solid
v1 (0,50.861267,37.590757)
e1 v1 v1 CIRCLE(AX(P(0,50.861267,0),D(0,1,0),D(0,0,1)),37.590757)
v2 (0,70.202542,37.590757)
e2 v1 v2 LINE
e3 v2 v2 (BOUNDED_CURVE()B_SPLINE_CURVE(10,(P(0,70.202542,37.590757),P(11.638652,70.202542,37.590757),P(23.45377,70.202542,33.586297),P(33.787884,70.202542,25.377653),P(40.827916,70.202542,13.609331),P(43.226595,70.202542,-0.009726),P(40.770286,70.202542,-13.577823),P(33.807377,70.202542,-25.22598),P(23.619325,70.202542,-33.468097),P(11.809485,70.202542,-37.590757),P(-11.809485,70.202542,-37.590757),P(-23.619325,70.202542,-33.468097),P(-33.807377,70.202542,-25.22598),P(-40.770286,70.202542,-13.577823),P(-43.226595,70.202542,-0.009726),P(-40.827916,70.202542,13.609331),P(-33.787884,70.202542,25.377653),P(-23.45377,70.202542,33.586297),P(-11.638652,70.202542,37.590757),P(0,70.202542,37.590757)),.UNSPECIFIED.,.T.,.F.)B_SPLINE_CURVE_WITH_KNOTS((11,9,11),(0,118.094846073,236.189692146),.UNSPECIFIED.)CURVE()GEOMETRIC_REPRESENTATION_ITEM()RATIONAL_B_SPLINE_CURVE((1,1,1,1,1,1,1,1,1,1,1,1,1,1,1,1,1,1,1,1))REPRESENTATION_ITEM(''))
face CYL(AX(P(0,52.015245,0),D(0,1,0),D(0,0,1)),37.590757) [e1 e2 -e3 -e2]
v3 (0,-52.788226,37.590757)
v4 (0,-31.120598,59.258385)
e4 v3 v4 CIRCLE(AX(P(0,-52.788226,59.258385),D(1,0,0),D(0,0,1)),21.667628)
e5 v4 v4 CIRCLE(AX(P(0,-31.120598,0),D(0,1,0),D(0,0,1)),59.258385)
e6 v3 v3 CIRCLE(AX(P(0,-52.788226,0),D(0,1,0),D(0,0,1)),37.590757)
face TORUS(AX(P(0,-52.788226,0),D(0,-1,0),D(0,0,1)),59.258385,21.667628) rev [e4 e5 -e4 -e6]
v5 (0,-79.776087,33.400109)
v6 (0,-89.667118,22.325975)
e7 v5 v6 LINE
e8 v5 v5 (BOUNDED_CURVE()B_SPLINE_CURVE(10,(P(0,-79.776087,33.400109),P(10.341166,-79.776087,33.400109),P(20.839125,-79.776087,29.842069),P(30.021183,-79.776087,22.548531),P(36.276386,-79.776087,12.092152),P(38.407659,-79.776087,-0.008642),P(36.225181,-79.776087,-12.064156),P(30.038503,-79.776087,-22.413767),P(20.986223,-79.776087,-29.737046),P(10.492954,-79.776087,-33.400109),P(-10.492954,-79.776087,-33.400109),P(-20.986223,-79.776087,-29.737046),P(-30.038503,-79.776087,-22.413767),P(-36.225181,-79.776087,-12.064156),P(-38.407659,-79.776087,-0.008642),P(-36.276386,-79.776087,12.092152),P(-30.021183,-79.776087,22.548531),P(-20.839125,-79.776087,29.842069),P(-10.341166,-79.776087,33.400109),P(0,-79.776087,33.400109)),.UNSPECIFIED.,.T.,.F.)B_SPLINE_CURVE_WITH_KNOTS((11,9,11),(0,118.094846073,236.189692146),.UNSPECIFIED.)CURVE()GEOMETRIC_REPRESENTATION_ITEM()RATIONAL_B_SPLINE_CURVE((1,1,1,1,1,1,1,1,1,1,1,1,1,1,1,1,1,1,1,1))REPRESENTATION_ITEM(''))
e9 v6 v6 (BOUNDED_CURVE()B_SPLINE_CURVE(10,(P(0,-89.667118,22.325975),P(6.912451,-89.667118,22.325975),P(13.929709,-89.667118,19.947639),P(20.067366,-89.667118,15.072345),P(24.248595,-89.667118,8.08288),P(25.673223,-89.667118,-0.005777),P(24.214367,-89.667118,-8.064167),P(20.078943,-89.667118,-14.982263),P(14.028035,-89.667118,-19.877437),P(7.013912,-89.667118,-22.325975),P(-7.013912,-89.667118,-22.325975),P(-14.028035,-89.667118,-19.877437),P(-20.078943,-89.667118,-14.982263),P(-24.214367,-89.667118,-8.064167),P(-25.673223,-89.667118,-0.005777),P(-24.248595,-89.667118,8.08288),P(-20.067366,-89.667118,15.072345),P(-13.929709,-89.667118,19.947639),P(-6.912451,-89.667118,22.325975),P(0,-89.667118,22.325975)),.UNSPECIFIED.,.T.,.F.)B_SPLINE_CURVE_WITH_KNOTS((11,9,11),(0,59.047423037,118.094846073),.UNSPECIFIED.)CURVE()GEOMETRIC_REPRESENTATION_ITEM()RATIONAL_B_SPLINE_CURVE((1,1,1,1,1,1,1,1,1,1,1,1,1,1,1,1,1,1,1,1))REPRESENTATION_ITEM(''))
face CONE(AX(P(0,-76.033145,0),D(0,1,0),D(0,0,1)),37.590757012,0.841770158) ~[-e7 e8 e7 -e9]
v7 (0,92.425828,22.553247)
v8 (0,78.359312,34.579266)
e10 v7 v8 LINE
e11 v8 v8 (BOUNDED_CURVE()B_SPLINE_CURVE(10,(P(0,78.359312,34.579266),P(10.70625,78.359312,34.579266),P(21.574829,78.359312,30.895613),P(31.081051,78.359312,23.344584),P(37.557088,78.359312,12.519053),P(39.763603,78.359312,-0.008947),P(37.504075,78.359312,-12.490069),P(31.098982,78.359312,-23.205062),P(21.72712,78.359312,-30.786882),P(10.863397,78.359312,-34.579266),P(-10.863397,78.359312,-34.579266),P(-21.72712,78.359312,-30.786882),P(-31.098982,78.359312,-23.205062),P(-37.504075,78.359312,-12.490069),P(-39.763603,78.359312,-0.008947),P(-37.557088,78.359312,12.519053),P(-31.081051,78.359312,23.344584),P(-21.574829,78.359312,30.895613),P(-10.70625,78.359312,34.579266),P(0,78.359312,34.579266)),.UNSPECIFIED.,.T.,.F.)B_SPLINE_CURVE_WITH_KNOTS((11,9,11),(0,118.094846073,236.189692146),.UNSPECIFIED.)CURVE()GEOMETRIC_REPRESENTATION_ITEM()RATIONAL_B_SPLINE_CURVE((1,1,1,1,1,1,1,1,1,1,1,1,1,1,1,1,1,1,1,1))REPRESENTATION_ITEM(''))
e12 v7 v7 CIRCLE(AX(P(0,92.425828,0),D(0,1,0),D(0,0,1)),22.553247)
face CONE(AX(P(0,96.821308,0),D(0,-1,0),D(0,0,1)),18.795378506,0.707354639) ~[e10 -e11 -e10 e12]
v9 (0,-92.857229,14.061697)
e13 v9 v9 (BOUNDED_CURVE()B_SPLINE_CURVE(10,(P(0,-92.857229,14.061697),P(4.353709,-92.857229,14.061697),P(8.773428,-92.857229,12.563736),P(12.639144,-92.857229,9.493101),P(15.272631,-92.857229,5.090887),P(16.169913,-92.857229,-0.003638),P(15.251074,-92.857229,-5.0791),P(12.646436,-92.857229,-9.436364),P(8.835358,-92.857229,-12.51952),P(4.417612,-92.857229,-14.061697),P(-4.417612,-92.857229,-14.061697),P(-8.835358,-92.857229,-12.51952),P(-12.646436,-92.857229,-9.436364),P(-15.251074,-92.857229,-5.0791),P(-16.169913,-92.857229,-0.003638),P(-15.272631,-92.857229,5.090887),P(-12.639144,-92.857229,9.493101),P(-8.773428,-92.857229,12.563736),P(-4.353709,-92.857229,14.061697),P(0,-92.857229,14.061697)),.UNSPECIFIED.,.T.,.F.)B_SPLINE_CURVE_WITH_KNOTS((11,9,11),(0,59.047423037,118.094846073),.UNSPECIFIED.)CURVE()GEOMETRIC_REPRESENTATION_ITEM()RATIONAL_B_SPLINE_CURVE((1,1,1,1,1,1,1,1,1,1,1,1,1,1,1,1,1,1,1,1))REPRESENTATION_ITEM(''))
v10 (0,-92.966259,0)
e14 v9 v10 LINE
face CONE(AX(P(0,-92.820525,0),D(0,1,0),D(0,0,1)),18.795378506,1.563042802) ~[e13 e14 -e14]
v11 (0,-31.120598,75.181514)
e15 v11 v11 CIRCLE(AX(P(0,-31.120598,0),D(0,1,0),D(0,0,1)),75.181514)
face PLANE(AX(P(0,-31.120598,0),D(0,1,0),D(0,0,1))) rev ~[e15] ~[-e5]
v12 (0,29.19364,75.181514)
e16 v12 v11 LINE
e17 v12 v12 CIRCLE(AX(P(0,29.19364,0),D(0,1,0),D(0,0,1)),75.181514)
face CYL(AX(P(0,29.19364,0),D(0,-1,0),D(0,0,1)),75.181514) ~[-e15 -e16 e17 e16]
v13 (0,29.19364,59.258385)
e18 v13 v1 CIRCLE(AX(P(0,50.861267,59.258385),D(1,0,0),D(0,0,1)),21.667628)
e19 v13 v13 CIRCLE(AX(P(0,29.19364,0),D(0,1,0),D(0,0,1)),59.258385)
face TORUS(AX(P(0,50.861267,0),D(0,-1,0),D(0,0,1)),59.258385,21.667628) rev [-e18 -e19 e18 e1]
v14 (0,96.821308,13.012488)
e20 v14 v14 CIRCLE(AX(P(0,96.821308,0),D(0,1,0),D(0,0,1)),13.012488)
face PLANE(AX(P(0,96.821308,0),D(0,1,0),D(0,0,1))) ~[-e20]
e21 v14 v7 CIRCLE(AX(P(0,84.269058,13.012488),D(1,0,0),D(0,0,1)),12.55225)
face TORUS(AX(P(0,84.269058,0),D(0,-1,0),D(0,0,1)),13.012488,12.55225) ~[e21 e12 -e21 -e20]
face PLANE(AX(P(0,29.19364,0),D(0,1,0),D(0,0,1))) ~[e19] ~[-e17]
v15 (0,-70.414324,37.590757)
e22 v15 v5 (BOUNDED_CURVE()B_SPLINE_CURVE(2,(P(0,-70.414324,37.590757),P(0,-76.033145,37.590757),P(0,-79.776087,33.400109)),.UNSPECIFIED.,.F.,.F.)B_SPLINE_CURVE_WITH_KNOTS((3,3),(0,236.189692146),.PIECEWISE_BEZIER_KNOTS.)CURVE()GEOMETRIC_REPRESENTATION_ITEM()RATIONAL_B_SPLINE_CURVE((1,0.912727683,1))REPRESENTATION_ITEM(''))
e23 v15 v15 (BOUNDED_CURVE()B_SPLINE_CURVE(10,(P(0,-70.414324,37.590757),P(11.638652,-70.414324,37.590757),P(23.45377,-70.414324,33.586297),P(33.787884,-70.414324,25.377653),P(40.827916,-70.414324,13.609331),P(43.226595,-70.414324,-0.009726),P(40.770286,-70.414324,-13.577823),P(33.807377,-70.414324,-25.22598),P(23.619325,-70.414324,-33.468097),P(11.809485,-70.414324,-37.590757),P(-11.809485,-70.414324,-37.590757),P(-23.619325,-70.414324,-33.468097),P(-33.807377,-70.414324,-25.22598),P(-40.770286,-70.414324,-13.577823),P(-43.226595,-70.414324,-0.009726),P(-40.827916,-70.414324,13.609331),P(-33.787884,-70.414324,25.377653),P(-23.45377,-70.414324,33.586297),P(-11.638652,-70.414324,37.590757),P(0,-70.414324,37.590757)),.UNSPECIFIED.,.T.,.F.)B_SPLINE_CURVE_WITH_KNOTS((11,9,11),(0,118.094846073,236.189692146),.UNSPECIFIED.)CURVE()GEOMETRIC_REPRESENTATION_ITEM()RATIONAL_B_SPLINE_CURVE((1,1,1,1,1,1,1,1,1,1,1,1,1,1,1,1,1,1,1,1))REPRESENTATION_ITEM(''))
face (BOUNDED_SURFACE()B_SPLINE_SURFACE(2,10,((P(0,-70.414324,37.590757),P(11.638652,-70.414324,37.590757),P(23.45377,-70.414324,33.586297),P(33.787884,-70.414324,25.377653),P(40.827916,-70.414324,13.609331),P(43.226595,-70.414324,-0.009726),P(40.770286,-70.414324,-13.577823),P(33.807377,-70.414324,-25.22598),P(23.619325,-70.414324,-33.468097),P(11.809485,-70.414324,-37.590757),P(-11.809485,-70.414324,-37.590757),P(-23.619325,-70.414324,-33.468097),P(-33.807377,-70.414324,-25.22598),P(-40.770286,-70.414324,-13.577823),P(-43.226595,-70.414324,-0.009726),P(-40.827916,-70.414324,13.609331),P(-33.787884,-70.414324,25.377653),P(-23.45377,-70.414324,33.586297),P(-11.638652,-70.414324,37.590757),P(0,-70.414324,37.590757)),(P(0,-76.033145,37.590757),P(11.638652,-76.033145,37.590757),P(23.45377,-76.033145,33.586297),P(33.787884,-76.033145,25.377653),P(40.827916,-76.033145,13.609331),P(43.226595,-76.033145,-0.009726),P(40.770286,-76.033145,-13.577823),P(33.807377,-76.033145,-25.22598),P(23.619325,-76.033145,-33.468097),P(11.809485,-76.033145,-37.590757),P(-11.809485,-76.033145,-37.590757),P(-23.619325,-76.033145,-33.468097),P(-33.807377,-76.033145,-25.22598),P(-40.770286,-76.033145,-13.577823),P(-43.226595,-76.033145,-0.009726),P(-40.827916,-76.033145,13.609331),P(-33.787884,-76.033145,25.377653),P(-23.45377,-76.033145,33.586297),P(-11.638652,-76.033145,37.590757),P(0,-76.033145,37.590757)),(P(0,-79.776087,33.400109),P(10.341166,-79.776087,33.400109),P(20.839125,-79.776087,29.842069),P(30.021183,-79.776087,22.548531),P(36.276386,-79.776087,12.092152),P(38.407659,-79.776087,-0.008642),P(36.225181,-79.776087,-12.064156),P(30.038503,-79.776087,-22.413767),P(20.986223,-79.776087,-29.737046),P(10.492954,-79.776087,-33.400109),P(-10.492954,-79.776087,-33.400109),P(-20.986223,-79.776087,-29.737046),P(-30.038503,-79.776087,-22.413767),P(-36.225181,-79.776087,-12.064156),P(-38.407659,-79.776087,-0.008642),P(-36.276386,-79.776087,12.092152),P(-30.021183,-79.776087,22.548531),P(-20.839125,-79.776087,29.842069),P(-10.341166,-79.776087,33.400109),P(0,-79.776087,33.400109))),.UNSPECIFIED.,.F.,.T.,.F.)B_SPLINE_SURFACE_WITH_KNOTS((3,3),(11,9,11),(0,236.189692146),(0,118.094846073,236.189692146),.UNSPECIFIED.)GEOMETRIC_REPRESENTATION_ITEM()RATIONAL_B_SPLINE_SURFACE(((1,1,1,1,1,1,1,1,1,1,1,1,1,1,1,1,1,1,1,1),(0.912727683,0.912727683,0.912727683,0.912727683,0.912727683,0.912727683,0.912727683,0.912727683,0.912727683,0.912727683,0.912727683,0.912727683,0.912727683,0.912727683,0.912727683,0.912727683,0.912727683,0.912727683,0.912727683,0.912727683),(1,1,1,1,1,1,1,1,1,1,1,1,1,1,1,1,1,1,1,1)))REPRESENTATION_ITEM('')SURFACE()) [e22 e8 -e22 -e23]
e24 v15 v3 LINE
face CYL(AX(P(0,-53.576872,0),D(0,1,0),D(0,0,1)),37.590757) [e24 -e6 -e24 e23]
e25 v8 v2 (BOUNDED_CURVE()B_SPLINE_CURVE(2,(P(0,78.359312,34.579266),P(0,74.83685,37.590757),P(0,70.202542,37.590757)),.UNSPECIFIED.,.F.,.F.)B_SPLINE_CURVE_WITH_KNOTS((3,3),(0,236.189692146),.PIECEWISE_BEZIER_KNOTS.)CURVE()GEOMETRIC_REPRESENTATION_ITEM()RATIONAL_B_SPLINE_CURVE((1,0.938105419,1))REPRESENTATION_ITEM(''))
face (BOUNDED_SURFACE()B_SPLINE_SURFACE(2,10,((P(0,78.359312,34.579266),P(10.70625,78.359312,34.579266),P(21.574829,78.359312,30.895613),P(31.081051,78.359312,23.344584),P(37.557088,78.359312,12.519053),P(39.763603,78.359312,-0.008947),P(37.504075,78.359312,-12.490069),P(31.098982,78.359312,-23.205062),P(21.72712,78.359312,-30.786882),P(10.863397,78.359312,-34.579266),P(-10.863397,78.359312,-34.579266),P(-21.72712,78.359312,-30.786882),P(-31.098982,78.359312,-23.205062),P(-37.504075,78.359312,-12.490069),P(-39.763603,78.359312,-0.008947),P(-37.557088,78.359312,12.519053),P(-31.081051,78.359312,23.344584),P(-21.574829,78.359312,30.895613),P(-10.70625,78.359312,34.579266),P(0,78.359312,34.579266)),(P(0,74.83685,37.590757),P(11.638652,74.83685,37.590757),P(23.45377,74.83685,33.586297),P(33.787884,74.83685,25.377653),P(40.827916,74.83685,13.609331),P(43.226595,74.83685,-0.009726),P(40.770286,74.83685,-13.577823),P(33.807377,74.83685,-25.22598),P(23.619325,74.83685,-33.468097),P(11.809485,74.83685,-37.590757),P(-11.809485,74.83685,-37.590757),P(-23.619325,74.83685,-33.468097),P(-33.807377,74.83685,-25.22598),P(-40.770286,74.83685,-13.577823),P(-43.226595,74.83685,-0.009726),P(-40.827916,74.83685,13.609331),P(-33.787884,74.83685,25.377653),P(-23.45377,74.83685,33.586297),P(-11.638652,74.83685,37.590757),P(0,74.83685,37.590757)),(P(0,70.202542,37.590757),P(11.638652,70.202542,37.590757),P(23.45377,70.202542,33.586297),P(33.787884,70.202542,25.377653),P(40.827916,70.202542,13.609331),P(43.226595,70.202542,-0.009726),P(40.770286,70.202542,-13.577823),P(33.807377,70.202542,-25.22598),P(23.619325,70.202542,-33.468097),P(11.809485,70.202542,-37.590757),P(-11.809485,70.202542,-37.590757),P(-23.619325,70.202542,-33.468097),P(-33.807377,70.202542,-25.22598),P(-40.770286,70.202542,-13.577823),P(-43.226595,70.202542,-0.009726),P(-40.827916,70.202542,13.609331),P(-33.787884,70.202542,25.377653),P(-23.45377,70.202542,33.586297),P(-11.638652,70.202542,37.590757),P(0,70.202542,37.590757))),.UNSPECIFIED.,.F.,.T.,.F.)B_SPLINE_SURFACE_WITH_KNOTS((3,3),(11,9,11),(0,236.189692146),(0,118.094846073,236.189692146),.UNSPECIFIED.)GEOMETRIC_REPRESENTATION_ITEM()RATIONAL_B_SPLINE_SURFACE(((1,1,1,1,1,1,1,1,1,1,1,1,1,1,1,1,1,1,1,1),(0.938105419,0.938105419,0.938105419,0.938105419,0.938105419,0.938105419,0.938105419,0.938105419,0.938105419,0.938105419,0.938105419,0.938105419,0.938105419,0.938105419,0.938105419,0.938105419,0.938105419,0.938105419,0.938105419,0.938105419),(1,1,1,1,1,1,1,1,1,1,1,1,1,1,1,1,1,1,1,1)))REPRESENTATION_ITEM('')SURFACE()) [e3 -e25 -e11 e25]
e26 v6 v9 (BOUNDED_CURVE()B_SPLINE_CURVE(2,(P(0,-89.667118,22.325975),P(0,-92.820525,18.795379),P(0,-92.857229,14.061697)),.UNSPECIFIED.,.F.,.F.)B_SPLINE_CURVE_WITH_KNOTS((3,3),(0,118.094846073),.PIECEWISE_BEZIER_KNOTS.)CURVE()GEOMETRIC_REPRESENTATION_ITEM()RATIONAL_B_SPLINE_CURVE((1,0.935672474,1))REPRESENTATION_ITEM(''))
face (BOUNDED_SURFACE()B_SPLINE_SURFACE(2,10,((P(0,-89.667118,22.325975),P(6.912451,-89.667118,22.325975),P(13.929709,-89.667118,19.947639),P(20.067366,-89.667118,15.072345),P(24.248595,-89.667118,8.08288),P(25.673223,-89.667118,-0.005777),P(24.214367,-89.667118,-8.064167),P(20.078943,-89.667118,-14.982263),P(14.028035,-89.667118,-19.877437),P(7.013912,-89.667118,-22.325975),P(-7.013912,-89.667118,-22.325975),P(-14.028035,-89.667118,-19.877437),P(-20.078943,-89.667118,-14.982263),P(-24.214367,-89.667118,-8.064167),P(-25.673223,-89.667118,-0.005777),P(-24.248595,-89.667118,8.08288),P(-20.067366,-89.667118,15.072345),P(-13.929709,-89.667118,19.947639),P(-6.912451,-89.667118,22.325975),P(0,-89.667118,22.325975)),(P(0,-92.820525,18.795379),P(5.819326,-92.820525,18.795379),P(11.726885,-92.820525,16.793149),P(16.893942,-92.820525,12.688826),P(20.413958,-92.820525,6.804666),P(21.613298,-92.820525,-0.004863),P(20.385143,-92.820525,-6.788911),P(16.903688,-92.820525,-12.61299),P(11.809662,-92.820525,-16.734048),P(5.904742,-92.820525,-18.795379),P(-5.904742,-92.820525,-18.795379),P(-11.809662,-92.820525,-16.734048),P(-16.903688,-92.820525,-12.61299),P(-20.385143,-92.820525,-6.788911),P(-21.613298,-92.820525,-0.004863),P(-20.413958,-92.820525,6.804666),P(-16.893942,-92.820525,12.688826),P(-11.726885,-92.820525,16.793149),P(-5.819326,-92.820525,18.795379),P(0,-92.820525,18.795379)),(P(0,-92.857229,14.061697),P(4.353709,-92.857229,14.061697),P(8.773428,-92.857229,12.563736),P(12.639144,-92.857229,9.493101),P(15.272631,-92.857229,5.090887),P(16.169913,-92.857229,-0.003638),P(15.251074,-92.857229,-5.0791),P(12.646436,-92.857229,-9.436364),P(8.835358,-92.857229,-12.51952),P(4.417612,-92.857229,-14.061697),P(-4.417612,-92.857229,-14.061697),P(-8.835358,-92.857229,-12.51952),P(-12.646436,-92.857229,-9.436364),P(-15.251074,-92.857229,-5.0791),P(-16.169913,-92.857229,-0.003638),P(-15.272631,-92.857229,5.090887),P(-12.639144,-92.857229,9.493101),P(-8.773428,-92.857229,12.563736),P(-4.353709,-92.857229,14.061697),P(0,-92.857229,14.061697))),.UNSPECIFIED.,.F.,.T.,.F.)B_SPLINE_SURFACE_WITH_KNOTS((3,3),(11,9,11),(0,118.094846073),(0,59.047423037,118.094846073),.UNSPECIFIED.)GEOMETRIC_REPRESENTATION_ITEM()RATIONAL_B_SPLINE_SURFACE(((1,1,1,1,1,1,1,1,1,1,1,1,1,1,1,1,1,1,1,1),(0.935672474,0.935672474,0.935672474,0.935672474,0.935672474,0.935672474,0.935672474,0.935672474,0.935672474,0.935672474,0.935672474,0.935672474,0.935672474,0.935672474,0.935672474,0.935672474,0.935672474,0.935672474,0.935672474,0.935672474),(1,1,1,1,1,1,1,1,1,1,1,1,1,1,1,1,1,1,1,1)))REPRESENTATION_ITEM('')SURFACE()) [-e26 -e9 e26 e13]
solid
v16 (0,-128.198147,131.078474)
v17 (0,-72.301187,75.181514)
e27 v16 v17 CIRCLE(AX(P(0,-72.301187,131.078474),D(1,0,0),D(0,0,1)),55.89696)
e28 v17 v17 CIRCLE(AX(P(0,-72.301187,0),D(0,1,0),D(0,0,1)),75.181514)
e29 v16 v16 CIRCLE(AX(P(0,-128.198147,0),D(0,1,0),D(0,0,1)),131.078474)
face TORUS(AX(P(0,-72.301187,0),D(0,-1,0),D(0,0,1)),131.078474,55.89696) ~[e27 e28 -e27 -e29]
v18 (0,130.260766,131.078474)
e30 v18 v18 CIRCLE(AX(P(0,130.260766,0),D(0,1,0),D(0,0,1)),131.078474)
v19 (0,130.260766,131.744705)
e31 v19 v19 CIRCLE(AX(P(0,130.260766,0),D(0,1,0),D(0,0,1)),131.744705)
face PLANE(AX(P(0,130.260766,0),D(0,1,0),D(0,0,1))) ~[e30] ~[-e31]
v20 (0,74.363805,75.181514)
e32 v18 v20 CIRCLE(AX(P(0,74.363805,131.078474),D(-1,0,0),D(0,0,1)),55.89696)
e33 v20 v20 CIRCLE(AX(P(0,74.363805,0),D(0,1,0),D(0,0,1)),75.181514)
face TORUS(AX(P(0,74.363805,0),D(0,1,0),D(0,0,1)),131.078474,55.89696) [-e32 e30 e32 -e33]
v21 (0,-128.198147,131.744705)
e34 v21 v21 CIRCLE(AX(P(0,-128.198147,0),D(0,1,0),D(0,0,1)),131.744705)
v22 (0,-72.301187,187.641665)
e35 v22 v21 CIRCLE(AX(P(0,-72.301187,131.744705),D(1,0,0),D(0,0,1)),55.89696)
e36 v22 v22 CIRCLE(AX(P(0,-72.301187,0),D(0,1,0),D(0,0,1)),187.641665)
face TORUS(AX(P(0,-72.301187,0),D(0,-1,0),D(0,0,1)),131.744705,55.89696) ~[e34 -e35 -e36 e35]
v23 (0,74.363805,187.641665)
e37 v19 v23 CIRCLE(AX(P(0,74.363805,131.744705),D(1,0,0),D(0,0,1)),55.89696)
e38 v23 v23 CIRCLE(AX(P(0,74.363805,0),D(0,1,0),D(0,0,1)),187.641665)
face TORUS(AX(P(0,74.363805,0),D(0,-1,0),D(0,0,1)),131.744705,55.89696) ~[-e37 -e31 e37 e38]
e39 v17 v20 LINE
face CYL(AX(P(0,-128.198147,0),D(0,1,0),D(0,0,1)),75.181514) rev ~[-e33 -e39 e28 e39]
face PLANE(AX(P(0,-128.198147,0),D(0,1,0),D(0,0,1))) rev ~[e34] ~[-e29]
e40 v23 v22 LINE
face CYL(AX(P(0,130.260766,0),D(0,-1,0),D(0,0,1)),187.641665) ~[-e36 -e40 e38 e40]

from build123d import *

# Parameters (mm, degrees)
F0_W   = 44.9125468731
F0_H   = 37.5907570124
F0_W_2 = 45.6432104111
F4_R   = 55.8969601189
F5_R   = 12.5522501698
F6_R   = 21.6676277208


with BuildPart() as f2:
    # F1 (on face) → F2 (revolve)
    with BuildSketch(Plane.YZ):
        Polygon((130.2607655525, 75.1815140247), (130.2607655525, 187.6416653395), (-128.1981468201, 187.6416653395), (-128.1981468201, 75.1815140247), (-31.1205983162, 75.1815140247), (29.1936397552, 75.1815140247), align=None)
    revolve(axis=Axis((0, -0.9634792805, 0), (0, 1, 0)))

    # F4
    f4_edges = [f2.edges().sort_by_distance(p)[0] for p in [
        (0, -128.198147, -187.641665),
        (0, 130.260766, -187.641665),
        (0, 130.260766, -75.181514),
        (0, -128.198147, -75.181514),
    ]]
    fillet(f4_edges, radius=F4_R)


with BuildPart() as f3:
    # F0 (on Right) → F3 (revolve)
    with BuildSketch(Plane.YZ):
        Polygon((29.1936397552, 75.1815140247), (-31.1205983162, 75.1815140247), (-31.1205983162, 37.5907570124), (-31.1205983162, 0), (29.1936397552, 0), (29.1936397552, 37.5907570124), align=None)
        with Locations((-53.5768717527, 18.7953785062)):
            Rectangle(F0_W, F0_H)
        Polygon((-76.0331451893, 0), (-76.0331451893, 37.5907570124), (-92.8205251694, 18.7953785062), (-92.9662585258, 0), align=None)
        with Locations((52.0152449608, 18.7953785062)):
            Rectangle(F0_W_2, F0_H)
        Polygon((96.821308136, 18.7953785062), (74.8368501663, 37.5907570124), (74.8368501663, 0), (96.821308136, 0), align=None)
    revolve(axis=Axis((0, -0.9634792805, 0), (0, 1, 0)))

    # F5
    f5_edges = [f3.edges().sort_by_distance(p)[0] for p in [
        (0, -76.033145, -37.590757),
        (0, -92.820525, -18.795379),
        (0, 74.83685, -37.590757),
        (0, 96.821308, -18.795379),
    ]]
    fillet(f5_edges, radius=F5_R)

    # F6
    f6_edges = [f3.edges().sort_by_distance(p)[0] for p in [
        (0, -31.120598, -37.590757),
        (0, 29.19364, -37.590757),
    ]]
    fillet(f6_edges, radius=F6_R)


solid = Compound([f2.part, f3.part])
